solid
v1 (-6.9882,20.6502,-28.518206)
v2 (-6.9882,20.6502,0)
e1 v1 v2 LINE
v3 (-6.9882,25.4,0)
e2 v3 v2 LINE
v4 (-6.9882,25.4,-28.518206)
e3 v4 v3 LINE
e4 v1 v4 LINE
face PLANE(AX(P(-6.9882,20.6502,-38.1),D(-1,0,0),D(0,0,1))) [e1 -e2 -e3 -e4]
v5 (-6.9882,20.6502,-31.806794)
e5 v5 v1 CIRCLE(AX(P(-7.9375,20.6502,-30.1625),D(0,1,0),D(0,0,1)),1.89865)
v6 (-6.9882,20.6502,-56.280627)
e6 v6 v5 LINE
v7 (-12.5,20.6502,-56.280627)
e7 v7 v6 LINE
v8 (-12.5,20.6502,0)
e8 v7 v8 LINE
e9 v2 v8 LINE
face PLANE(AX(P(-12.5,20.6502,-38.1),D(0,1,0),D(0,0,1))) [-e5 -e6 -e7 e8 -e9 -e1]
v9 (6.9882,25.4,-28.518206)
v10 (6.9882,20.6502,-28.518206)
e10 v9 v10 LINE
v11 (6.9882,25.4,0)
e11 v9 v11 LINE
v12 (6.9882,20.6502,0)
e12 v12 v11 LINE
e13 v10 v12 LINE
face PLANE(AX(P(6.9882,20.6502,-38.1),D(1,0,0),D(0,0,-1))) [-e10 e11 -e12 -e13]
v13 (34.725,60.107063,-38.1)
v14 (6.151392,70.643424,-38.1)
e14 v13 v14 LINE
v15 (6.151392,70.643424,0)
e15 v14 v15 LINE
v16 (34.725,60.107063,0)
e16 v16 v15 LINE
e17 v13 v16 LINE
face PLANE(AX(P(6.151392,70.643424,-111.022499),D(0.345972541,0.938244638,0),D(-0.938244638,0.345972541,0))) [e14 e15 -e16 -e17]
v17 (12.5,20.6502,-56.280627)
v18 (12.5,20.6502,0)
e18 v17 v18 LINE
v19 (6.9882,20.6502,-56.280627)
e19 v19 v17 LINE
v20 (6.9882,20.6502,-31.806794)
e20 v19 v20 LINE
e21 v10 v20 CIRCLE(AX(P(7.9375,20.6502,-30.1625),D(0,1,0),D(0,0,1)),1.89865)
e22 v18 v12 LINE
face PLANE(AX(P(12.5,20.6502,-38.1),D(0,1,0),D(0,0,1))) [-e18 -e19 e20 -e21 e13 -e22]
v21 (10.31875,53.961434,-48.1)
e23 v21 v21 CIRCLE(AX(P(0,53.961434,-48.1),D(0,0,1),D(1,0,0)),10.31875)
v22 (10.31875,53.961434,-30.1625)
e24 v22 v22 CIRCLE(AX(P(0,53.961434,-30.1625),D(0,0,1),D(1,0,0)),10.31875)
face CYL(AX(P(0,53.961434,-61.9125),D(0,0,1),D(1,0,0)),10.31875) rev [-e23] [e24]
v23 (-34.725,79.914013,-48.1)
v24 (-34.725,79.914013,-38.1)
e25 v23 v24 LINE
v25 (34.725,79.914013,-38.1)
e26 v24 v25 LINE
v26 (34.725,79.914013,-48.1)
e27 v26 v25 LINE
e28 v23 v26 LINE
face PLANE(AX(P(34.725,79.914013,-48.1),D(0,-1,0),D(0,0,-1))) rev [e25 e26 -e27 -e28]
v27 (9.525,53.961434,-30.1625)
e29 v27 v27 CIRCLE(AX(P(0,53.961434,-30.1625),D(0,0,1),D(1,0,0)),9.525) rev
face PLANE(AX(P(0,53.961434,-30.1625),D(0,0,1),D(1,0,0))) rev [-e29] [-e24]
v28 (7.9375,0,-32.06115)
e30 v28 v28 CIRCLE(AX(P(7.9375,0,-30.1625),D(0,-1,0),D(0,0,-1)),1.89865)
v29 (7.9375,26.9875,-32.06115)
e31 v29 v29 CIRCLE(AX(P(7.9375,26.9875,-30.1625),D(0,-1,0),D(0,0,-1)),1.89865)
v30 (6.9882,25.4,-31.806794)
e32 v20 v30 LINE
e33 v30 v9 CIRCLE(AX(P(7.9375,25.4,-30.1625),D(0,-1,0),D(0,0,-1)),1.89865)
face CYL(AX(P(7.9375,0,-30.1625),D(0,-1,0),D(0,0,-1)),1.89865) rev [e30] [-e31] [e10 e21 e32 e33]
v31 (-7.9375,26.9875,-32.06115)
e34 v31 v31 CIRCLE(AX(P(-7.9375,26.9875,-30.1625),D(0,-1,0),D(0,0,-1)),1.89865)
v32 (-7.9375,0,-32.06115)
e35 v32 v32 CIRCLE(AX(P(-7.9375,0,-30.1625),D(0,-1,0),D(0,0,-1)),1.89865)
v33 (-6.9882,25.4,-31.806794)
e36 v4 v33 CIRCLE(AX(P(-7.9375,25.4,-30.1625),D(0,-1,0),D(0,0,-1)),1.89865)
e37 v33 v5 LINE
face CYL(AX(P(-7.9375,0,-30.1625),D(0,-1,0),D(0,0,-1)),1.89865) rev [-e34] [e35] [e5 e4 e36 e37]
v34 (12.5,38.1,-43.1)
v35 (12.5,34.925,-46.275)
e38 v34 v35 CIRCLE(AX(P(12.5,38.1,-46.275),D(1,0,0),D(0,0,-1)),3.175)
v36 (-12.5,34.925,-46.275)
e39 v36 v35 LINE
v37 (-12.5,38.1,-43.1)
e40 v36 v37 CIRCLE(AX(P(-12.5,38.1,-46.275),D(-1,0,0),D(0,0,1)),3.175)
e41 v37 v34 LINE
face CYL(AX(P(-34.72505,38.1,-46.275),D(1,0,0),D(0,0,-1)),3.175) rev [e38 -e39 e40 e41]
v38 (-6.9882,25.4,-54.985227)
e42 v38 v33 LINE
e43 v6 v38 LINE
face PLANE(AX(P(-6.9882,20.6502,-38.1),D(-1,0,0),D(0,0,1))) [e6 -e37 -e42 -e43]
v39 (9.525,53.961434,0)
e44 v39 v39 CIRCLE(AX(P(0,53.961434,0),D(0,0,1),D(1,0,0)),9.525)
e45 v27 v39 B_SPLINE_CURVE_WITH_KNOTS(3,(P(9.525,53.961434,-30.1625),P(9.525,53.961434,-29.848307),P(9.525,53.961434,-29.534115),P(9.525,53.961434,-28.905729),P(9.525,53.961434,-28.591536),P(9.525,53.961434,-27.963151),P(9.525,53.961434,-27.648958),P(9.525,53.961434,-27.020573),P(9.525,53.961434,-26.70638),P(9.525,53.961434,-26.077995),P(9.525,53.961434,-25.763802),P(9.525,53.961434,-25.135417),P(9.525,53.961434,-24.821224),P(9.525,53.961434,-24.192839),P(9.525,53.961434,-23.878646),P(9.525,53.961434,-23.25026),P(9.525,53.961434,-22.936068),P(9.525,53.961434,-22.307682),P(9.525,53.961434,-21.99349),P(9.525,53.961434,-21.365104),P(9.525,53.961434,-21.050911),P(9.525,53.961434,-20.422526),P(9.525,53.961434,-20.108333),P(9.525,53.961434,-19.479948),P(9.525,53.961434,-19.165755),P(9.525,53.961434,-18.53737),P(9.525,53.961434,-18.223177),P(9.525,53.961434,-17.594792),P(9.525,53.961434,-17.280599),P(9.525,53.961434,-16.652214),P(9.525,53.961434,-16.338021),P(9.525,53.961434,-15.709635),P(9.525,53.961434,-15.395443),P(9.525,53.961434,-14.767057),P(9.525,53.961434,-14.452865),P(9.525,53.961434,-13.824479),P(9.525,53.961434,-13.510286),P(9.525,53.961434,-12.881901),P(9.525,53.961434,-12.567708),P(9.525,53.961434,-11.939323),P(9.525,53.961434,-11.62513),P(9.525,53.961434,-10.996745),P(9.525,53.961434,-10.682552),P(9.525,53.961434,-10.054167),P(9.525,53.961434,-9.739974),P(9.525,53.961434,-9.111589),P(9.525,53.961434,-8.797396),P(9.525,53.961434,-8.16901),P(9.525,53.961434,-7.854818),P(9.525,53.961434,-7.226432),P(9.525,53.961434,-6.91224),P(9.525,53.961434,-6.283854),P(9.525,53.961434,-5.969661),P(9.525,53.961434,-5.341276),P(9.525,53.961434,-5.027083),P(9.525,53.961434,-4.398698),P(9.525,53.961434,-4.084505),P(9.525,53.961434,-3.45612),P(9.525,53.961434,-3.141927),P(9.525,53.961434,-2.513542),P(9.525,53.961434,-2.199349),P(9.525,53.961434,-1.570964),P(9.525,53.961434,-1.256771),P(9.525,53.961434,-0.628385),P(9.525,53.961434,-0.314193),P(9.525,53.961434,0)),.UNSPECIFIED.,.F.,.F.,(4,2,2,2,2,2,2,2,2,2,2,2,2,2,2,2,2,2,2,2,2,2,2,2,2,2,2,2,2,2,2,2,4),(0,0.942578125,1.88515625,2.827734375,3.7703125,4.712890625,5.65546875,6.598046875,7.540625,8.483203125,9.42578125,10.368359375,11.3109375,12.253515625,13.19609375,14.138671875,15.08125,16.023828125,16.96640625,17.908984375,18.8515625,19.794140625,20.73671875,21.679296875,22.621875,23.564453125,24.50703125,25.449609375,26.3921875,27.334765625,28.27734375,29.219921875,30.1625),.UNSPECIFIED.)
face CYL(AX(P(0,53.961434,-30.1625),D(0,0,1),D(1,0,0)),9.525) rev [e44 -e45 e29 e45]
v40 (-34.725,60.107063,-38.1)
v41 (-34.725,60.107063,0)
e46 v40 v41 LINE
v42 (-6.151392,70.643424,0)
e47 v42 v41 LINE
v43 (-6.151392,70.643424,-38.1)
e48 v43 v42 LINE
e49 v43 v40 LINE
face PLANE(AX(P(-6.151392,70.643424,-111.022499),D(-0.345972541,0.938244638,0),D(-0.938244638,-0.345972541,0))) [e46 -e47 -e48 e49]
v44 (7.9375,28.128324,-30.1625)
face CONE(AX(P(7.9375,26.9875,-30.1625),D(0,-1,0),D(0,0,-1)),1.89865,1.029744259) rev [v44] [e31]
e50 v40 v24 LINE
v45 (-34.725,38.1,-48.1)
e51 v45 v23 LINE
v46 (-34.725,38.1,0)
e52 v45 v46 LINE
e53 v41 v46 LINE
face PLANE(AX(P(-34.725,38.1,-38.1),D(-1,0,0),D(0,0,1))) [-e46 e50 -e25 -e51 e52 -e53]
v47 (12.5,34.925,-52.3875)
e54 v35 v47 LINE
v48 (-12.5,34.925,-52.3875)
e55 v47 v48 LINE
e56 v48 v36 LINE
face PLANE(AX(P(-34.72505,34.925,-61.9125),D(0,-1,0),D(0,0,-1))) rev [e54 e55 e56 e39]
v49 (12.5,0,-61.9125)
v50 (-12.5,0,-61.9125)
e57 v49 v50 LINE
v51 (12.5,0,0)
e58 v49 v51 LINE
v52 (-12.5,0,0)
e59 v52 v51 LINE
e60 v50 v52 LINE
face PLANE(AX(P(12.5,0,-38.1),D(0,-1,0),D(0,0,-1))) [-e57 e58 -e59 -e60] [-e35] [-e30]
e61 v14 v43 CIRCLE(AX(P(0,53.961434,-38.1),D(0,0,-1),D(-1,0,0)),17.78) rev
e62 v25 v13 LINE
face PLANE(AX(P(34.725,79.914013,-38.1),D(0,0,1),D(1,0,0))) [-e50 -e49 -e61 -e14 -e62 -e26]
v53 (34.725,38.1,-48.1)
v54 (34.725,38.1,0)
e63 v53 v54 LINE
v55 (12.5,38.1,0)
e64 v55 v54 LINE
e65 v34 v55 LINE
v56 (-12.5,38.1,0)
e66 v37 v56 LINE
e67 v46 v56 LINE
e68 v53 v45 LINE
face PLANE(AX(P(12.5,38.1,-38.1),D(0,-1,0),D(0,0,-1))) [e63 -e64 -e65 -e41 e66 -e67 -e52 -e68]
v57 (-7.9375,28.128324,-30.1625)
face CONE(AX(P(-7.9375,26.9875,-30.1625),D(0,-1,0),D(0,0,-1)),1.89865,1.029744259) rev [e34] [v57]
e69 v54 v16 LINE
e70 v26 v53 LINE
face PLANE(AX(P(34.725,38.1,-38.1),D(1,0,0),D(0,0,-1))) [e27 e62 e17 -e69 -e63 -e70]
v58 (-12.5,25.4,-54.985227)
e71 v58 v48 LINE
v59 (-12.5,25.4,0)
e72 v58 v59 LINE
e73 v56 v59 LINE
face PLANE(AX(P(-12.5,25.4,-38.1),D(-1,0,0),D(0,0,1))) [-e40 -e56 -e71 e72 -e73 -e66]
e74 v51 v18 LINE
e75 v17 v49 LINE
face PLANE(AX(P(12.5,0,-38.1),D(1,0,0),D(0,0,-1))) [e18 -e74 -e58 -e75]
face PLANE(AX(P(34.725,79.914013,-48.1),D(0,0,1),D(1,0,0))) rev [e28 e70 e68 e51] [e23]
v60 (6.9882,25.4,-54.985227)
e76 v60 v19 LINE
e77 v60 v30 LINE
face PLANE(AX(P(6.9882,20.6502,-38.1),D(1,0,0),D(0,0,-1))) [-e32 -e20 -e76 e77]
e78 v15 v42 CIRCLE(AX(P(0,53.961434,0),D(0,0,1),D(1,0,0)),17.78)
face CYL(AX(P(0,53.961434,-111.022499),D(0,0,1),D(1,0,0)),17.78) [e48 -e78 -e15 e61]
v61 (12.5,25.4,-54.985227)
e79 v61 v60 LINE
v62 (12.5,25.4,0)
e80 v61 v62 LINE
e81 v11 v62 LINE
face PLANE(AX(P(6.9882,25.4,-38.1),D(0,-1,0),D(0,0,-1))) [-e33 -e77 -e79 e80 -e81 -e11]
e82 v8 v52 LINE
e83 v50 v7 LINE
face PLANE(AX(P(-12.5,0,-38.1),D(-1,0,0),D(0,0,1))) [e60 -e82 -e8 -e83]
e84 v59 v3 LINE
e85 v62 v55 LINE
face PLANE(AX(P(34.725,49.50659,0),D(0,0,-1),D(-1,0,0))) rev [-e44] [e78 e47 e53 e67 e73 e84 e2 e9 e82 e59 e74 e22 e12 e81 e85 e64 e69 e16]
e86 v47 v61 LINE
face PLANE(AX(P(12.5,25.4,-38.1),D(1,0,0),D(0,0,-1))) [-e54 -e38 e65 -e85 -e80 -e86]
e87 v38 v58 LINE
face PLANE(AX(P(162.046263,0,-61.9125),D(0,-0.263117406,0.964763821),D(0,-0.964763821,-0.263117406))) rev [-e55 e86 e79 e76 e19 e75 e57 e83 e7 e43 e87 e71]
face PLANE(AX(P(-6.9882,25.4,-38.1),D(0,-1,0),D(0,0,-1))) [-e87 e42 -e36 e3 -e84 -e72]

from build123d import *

# Parameters (mm, degrees)
EXTRUDE1_DEPTH                   = 38.1
EXTRUDE2_DEPTH                   = 38.1
SKETCH4_W                        = 69.45
SKETCH4_H                        = 41.814012965
EXTRUDE3_DEPTH                   = 10
EXTRUDE4_DEPTH                   = 23.8125
CUT_EXTRUDE4_DEPTH               = 107.888880382
CUT_EXTRUDE4_DEPTH_BACK          = 107.888880382
F_25_0_1495_DIAMETER_HOLE1_D     = 3.7973
F_25_0_1495_DIAMETER_HOLE1_DEPTH = 26.9875
F_25_0_1495_DIAMETER_HOLE1_TIP   = 1.140824014
SKETCH11_R                       = 9.525
CUT_EXTRUDE2_DEPTH               = 30.1625
SKETCH12_R                       = 10.31875
CUT_EXTRUDE3_DEPTH               = 93.736926805
CUT_EXTRUDE5_START               = -12.5
CUT_EXTRUDE5_DEPTH               = 25


# Read off the part's stored shape, not the designer's step: Cut-Extrude5
with BuildPart() as part:
    # Sketch1 → Extrude1 (new body)
    with BuildSketch(Plane.XY):
        Polygon((12.5, 0), (-12.5, 0), (-12.5, 20.6502), (-6.9882, 20.6502), (-6.9882, 25.4), (-12.5, 25.4), (-12.5, 38.1), (-34.725, 38.1), (-34.725, 49.506590038), (34.725, 49.506590038), (34.725, 38.1), (12.5, 38.1), (12.5, 25.4), (6.9882, 25.4), (6.9882, 20.6502), (12.5, 20.6502), align=None)
    extrude(amount=-EXTRUDE1_DEPTH)

    # Sketch2 → Extrude2 (add)
    with BuildSketch(Plane.XY):
        with BuildLine():
            Line((-34.725, 60.107063342), (-34.725, 49.506590038))
            Line((-34.725, 49.506590038), (34.725, 49.506590038))
            Line((34.725, 49.506590038), (34.725, 60.107063342))
            Line((34.725, 60.107063342), (6.151391783, 70.643423952))
            ThreePointArc((6.151391783, 70.643423952), (0, 71.741434289), (-6.151391783, 70.643423952))
            Line((-6.151391783, 70.643423952), (-34.725, 60.107063342))
        make_face()
    extrude(amount=-EXTRUDE2_DEPTH)

    # Sketch4 → Extrude3 (add)
    with BuildSketch(Plane(origin=(0, 0, -38.1), x_dir=(-1, 0, 0), z_dir=(0, 0, -1))):
        with Locations((0, 59.007006483)):
            Rectangle(SKETCH4_W, SKETCH4_H)
    extrude(amount=EXTRUDE3_DEPTH)

    # Sketch13 → Extrude4 (add)
    with BuildSketch(Plane(origin=(0, 0, -38.1), x_dir=(-1, 0, 0), z_dir=(0, 0, -1))):
        Polygon((12.5, 38.1), (-12.5, 38.1), (-12.5, 25.4), (-6.9882, 25.4), (-6.9882, 20.6502), (-12.5, 20.6502), (-12.5, 0), (12.5, 0), (12.5, 20.6502), (6.9882, 20.6502), (6.9882, 25.4), (12.5, 25.4), align=None)
    extrude(amount=EXTRUDE4_DEPTH)

    # Sketch14 → Cut-Extrude4 (cut, two sides: drawn at the far end of the back side and taken through both)
    with BuildSketch(Plane(origin=(0, 0, 0), x_dir=(0, 0, -1), z_dir=(1, 0, 0)).offset(-CUT_EXTRUDE4_DEPTH_BACK)):
        with BuildLine():
            Line((61.9125, 38.1), (43.1, 38.1))
            ThreePointArc((43.1, 38.1), (44.02993597, 35.85493597), (46.275, 34.925))
            Line((46.275, 34.925), (61.9125, 34.925))
            Line((61.9125, 34.925), (61.9125, 38.1))
        make_face()
    extrude(amount=CUT_EXTRUDE4_DEPTH + CUT_EXTRUDE4_DEPTH_BACK, mode=Mode.SUBTRACT)

    # #25 (0.1495) Diameter Hole1
    with Locations(Plane.XZ):
        with Locations((-7.9375, -30.1625), (7.9375, -30.1625)):
            Hole(F_25_0_1495_DIAMETER_HOLE1_D / 2, depth=F_25_0_1495_DIAMETER_HOLE1_DEPTH)
            with Locations((0, 0, -(F_25_0_1495_DIAMETER_HOLE1_DEPTH + F_25_0_1495_DIAMETER_HOLE1_TIP / 2))):  # 118° drill point
                Cone(0, F_25_0_1495_DIAMETER_HOLE1_D / 2, F_25_0_1495_DIAMETER_HOLE1_TIP, mode=Mode.SUBTRACT)

    # Sketch11 → Cut-Extrude2 (cut)
    with BuildSketch(Plane.XY):
        with Locations((0, 53.961434289)):
            Circle(SKETCH11_R)
    extrude(amount=-CUT_EXTRUDE2_DEPTH, mode=Mode.SUBTRACT)

    # Sketch12 → Cut-Extrude3 (cut, through all)
    with BuildSketch(Plane.XY.offset(-30.1625)):
        with Locations((0, 53.961434289)):
            Circle(SKETCH12_R)
    extrude(amount=-CUT_EXTRUDE3_DEPTH, mode=Mode.SUBTRACT)

    # Cut-Extrude5 outline → Cut-Extrude5 (cut)
    with BuildSketch(Plane(origin=(0, 0, 0), x_dir=(0, 0, -1), z_dir=(1, 0, 0)).offset(CUT_EXTRUDE5_START)):
        Polygon((61.9125, 34.925), (52.3875, 34.925), (61.9125, 0), align=None)
    extrude(amount=CUT_EXTRUDE5_DEPTH, mode=Mode.SUBTRACT)


solid = part.part
